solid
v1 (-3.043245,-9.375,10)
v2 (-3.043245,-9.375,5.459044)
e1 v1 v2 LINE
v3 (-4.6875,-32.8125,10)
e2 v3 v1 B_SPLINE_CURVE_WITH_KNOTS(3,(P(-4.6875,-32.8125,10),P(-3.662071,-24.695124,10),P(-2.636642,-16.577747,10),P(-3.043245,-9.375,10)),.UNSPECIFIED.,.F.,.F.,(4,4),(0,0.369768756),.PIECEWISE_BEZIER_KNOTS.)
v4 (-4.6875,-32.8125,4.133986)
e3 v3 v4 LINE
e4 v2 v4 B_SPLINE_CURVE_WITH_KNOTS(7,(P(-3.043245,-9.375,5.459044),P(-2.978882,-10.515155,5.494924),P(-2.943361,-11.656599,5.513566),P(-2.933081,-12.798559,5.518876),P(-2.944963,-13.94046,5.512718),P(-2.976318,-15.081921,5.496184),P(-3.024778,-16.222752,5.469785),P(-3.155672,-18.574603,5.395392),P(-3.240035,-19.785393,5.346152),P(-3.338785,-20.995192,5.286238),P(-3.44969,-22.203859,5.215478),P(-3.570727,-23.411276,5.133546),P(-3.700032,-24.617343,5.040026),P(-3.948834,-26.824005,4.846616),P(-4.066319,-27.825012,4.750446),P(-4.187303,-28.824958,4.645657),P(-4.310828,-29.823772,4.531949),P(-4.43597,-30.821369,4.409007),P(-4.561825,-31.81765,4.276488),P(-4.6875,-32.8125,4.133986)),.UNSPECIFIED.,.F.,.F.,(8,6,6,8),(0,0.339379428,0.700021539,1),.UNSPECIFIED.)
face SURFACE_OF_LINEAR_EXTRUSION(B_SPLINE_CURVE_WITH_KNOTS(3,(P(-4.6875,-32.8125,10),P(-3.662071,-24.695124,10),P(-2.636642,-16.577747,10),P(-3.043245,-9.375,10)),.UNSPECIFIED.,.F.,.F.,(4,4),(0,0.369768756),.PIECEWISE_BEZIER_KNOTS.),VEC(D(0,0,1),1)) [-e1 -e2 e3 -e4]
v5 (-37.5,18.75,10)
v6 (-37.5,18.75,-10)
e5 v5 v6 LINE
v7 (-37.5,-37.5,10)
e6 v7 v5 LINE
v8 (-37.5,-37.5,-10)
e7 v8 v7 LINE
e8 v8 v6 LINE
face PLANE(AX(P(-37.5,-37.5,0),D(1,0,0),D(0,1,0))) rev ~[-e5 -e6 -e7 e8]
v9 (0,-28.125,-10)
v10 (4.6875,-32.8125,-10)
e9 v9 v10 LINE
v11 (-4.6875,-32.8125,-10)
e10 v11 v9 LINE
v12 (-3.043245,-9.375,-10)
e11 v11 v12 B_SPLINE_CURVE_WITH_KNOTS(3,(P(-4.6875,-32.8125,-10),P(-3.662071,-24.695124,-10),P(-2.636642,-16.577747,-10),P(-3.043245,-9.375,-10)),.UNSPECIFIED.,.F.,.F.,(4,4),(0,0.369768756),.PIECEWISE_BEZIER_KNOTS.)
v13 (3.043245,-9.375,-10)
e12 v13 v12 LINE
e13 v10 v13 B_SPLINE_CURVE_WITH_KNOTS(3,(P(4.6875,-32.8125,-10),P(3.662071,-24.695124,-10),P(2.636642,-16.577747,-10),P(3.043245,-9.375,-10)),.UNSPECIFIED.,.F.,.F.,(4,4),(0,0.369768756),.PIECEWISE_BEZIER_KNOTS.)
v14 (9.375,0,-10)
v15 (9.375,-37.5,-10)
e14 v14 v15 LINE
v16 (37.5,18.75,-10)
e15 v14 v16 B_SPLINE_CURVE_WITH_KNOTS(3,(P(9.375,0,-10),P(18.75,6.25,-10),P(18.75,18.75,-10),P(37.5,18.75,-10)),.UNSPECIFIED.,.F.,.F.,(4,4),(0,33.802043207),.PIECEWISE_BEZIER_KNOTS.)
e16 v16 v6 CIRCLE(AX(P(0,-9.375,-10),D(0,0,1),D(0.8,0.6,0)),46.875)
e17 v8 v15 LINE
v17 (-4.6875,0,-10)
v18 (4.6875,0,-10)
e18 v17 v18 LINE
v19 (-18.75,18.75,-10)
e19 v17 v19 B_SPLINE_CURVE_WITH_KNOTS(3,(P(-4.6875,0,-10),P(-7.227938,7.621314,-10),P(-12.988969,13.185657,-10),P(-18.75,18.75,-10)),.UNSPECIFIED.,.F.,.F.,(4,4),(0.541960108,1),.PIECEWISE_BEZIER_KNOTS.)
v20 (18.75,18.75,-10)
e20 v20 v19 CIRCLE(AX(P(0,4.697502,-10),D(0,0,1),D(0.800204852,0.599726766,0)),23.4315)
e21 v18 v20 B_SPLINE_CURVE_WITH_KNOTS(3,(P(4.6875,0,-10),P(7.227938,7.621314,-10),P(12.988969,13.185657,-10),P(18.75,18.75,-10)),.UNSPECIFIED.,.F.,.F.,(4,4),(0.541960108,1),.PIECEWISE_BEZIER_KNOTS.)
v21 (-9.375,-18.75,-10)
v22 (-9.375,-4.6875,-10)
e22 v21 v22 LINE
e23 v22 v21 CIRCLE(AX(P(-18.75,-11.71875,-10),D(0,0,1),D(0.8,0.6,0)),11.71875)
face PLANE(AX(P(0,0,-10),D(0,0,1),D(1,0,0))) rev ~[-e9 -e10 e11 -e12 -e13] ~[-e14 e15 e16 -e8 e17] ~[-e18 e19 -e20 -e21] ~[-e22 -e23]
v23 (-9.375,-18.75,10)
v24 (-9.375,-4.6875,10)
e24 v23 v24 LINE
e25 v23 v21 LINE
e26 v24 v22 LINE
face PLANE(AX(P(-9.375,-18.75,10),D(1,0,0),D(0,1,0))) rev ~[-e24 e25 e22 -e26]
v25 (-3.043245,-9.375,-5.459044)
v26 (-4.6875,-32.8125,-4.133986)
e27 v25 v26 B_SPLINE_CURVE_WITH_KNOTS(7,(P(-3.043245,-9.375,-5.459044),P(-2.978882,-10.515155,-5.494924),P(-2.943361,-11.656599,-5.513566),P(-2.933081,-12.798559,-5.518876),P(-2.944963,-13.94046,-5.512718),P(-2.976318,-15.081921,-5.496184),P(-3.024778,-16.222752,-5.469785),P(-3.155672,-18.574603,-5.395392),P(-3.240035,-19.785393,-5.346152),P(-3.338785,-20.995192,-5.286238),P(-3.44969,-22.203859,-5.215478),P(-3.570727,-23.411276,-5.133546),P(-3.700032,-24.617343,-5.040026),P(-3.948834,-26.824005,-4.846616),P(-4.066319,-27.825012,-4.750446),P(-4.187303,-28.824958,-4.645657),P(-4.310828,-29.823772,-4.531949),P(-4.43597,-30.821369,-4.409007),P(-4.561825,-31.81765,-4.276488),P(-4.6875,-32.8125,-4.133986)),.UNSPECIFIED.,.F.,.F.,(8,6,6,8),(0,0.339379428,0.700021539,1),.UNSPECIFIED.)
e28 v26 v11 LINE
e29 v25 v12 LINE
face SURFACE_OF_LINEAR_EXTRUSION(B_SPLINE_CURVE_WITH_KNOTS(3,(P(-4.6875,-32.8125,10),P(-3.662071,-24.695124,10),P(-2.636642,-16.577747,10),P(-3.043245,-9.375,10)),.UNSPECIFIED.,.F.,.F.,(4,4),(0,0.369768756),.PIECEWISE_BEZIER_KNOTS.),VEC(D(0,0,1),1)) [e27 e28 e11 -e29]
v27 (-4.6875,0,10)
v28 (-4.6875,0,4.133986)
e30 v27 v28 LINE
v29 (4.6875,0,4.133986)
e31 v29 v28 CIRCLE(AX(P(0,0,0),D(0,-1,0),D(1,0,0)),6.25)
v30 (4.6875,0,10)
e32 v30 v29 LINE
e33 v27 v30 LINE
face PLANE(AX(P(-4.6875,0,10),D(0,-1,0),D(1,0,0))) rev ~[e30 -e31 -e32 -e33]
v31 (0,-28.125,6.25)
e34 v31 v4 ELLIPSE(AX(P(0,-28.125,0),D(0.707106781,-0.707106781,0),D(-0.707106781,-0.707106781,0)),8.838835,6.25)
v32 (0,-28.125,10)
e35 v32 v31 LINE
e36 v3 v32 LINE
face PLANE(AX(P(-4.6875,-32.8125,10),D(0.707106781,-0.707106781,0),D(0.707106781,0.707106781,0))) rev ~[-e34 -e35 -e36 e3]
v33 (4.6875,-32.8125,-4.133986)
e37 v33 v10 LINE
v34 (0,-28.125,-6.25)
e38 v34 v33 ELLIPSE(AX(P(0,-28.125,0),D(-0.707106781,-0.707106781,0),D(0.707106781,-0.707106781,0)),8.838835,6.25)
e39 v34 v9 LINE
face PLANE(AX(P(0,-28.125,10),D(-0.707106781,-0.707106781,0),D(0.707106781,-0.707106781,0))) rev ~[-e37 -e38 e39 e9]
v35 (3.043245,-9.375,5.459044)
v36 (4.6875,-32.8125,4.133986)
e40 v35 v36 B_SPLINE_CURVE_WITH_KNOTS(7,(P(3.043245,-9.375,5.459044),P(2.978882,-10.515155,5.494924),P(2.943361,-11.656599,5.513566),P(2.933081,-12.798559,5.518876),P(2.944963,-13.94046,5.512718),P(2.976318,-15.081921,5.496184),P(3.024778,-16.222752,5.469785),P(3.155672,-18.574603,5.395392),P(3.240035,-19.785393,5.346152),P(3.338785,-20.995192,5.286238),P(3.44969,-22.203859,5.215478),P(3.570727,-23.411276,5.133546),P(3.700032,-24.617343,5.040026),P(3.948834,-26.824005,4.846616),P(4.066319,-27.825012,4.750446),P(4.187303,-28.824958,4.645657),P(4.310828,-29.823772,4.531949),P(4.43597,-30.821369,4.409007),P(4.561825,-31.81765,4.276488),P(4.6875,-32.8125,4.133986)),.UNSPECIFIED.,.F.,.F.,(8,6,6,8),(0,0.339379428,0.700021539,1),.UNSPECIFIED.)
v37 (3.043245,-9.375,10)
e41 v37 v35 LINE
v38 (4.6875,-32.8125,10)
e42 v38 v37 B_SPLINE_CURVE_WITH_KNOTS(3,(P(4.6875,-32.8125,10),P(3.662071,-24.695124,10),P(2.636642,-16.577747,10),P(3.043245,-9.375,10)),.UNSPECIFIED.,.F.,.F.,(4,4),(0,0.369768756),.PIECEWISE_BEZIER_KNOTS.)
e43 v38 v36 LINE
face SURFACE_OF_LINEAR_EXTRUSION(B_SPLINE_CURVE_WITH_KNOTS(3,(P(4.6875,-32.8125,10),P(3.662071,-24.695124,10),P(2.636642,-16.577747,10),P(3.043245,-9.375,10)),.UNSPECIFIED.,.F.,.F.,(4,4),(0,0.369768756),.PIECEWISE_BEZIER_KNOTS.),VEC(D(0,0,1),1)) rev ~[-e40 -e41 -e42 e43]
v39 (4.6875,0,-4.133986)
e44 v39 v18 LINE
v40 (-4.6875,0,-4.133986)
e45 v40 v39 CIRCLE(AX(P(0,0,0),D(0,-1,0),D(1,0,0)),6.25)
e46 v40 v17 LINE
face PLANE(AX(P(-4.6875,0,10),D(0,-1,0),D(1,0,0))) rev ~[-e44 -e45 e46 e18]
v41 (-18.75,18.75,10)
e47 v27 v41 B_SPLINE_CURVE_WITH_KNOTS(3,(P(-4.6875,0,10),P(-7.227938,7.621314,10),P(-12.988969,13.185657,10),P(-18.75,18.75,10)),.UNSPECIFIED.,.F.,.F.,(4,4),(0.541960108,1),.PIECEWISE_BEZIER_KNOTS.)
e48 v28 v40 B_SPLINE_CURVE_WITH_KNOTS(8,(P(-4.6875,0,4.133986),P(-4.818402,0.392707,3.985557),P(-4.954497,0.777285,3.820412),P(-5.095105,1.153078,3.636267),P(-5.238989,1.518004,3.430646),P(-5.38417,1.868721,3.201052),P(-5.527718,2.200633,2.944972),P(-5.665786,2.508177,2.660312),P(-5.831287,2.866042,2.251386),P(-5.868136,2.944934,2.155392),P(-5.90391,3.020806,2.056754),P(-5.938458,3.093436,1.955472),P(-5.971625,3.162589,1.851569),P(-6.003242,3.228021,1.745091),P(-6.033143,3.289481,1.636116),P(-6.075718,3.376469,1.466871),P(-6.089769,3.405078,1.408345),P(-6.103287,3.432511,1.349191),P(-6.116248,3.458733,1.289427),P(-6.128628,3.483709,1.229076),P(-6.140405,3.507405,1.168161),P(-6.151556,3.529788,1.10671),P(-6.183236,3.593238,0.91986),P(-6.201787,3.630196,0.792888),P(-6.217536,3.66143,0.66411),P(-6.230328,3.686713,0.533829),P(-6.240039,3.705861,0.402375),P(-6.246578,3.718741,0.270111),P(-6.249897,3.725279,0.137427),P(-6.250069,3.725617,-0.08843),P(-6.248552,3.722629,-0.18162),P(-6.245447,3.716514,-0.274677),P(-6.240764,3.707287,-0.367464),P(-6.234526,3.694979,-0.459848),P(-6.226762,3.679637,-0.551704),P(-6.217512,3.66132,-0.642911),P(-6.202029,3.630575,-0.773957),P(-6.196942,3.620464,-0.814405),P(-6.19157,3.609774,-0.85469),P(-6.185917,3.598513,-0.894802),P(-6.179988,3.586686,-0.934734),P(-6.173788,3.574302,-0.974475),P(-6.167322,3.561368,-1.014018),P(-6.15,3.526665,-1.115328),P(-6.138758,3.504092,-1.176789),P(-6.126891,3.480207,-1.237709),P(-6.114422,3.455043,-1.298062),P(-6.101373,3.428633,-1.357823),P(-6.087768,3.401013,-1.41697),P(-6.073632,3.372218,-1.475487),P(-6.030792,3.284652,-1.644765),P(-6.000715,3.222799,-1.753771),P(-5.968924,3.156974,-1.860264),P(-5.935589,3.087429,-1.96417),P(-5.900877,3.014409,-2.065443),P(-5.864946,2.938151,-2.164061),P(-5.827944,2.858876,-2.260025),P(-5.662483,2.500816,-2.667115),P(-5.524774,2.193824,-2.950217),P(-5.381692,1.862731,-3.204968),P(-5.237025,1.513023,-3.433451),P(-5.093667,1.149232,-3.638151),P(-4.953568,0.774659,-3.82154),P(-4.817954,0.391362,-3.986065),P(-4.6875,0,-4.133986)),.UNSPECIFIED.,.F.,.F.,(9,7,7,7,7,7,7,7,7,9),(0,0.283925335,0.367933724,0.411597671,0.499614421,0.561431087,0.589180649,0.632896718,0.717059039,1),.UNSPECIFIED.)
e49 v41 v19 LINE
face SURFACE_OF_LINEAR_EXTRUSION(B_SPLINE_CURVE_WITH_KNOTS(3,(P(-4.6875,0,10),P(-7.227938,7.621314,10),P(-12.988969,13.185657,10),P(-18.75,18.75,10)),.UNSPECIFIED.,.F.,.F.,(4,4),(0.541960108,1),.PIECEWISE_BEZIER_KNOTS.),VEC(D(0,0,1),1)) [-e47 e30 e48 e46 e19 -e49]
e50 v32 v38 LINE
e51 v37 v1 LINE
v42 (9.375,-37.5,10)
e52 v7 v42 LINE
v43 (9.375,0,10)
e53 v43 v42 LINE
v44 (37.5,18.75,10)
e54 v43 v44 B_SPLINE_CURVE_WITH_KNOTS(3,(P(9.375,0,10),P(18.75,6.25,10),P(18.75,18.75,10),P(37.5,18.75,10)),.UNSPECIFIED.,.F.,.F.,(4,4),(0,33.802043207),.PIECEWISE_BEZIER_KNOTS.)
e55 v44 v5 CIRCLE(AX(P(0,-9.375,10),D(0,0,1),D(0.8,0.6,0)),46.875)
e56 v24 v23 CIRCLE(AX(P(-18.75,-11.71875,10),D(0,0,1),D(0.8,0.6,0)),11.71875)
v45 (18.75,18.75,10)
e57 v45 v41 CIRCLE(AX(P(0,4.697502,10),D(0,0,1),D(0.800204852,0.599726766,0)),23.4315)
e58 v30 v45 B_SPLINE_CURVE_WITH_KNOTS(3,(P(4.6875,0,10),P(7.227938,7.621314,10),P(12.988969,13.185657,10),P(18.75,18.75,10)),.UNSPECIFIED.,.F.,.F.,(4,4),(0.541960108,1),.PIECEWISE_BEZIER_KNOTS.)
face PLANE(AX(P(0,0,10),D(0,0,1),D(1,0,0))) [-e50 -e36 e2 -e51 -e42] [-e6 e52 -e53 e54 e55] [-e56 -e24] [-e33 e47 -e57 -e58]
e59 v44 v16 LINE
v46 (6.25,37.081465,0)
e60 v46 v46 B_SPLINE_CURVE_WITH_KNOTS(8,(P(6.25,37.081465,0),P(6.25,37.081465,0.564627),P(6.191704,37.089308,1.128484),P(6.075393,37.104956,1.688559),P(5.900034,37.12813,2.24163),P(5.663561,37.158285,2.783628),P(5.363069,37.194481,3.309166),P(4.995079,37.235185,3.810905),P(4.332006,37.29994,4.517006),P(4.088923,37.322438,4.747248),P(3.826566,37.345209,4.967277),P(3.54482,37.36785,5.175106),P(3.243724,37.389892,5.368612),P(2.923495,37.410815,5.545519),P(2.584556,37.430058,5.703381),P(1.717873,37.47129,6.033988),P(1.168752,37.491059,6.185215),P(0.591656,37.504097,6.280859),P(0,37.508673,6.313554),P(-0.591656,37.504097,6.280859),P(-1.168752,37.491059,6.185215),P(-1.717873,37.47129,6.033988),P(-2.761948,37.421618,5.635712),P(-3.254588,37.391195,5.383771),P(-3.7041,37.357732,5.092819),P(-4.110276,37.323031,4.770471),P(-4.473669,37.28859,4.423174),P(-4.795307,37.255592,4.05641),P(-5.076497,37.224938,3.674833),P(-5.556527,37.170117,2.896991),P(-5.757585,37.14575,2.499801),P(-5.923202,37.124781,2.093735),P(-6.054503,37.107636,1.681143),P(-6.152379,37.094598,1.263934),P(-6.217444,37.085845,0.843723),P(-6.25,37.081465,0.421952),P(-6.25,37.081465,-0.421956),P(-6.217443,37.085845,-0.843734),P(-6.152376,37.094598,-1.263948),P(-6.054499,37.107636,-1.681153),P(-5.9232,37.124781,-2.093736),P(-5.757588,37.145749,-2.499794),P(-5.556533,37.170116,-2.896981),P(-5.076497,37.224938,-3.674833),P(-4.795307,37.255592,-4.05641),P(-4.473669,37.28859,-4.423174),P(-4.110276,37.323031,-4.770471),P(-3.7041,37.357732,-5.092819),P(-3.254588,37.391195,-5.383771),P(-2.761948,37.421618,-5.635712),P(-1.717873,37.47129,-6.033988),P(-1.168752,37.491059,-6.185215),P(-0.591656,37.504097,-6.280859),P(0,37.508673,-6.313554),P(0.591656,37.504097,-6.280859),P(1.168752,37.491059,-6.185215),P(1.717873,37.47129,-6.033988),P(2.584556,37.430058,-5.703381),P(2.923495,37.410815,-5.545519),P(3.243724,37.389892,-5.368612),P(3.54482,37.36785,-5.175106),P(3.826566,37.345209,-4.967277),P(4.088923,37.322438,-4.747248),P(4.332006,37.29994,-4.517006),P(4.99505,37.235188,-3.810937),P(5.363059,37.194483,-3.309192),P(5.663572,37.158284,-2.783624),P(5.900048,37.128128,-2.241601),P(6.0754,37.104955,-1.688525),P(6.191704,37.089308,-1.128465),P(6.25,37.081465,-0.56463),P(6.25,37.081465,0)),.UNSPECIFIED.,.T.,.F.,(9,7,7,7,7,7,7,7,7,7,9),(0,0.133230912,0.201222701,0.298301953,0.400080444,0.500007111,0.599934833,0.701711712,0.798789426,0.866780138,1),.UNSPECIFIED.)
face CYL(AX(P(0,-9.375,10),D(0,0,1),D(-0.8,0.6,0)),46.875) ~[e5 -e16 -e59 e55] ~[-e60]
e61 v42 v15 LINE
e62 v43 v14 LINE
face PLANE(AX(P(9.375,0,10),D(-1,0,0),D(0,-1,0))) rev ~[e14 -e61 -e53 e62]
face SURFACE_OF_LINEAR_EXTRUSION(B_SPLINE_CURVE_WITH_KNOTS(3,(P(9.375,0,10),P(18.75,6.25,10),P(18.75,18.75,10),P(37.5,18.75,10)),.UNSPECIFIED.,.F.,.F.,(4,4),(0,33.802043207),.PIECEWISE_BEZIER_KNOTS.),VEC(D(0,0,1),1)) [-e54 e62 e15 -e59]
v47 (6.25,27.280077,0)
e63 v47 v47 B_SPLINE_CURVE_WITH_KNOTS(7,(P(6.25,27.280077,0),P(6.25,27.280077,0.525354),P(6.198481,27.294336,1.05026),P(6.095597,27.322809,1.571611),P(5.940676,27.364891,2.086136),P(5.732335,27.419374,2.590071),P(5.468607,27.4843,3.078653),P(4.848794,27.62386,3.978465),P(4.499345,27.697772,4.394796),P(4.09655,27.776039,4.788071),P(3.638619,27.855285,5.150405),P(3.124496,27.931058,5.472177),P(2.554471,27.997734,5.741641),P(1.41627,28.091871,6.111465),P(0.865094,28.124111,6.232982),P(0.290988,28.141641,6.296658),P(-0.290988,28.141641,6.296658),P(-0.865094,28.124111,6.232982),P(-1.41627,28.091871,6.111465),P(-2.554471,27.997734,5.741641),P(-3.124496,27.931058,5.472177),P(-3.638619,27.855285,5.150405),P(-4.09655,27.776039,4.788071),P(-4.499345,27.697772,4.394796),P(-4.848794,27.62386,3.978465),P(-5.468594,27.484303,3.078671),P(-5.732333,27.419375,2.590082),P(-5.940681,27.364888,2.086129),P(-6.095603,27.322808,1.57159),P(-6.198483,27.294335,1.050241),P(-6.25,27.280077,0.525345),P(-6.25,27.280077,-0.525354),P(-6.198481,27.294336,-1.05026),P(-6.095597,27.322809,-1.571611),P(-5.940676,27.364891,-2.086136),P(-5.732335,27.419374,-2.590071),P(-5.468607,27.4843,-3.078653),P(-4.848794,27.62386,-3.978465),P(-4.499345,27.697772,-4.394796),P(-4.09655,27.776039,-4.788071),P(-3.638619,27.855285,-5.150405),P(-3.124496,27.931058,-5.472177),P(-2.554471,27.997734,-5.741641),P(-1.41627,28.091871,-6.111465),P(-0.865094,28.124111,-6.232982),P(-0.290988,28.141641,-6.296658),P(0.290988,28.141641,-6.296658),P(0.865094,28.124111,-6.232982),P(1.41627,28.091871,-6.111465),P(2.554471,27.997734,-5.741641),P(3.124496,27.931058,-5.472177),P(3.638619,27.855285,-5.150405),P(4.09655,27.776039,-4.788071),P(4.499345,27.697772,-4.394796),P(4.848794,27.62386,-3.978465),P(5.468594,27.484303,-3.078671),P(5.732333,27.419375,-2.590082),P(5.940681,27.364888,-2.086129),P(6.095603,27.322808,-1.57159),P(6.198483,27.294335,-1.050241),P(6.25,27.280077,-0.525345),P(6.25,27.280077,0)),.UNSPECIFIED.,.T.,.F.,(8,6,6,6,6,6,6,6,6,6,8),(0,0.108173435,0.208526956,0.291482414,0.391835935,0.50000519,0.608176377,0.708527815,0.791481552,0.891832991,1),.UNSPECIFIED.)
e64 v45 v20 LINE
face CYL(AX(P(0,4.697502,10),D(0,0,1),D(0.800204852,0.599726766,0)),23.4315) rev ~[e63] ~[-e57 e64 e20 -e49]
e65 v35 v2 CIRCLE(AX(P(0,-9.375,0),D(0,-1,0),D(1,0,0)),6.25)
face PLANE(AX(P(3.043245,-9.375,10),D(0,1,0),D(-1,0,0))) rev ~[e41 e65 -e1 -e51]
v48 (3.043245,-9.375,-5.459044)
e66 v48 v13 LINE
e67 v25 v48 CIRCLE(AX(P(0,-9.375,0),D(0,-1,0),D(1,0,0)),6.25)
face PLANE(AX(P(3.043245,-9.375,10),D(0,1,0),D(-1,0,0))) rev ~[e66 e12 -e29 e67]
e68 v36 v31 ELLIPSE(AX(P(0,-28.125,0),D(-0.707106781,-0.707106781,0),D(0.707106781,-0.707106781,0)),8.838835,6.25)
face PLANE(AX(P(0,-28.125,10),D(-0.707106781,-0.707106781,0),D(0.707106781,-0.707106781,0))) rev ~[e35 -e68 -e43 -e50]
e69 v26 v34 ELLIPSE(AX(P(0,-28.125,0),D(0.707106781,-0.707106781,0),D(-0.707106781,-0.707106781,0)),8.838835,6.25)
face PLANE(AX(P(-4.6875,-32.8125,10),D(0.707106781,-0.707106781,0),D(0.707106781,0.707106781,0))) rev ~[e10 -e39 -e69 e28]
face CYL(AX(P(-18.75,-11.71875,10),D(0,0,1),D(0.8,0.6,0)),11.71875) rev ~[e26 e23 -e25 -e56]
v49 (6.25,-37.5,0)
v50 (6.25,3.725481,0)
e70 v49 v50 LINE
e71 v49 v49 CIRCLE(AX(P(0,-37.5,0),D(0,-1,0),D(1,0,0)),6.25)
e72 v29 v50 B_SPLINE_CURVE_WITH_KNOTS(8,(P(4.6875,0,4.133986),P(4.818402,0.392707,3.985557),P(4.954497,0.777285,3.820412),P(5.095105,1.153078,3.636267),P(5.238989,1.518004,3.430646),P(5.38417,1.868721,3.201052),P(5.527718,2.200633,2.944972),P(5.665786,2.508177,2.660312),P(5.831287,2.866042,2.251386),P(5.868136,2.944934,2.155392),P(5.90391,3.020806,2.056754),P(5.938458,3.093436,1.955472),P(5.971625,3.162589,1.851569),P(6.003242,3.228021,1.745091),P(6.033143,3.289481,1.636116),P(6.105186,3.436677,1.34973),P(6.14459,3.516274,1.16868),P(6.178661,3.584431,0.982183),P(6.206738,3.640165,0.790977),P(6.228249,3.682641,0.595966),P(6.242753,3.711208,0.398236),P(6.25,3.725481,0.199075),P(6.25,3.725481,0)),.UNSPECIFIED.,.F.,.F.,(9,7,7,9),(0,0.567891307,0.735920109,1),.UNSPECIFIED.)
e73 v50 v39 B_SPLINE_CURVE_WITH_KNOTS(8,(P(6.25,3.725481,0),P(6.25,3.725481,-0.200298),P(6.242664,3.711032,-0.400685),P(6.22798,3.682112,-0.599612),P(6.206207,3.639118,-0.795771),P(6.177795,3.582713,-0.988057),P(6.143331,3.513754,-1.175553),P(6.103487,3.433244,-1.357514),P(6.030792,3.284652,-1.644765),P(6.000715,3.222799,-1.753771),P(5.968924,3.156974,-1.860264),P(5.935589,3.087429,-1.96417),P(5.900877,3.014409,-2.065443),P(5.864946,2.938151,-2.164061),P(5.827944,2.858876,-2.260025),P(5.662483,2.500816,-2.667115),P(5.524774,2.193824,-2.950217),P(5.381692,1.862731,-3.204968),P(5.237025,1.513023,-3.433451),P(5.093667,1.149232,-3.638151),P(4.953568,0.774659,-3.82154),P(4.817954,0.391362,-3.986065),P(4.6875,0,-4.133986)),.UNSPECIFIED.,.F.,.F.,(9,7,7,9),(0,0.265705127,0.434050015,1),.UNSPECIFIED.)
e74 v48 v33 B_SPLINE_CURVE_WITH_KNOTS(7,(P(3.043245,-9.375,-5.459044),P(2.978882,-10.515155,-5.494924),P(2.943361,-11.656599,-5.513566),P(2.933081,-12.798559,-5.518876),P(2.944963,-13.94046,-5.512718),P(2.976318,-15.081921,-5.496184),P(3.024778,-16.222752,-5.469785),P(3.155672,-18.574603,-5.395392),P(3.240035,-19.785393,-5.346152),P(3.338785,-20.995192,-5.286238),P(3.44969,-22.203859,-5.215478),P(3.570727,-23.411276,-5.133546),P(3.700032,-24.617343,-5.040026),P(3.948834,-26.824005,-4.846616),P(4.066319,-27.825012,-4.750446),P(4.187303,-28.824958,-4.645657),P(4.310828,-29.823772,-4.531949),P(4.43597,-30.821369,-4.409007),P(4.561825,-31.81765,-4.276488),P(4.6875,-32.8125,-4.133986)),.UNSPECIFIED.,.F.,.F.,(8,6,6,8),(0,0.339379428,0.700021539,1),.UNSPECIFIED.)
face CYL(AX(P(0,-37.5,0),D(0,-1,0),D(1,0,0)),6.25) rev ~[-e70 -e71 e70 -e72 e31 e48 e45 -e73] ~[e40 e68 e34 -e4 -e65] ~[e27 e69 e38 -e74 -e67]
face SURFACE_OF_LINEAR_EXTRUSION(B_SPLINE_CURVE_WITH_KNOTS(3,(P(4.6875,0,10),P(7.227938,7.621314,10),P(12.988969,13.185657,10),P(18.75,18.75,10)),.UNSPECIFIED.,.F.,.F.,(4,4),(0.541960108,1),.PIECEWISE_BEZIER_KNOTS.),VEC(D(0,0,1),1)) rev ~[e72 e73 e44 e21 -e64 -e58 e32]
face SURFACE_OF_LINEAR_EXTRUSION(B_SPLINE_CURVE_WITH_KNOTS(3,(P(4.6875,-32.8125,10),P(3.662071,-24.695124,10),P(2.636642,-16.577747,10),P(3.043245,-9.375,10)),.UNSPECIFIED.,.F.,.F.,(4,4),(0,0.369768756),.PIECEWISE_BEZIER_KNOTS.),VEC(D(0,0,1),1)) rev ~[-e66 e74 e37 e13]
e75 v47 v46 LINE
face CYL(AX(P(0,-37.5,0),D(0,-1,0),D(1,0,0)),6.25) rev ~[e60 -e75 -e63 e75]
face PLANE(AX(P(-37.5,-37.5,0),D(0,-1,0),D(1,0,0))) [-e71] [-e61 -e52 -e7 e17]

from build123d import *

# Parameters (mm, degrees)
F0_W          = 75
F0_H          = 75
F1_DEPTH      = 10
F1_DEPTH_BACK = 10
F3_DEPTH      = 20
F4_R          = 6.25
F5_DEPTH      = 75


# Not quite as in the source:
# - a feature names something its author has since deleted; it is built from what else it names


with BuildPart() as f1:
    # F0 (on Top) → F1 (new body, two sides)
    with BuildSketch(Plane.XY) as f1_sk:
        Rectangle(F0_W, F0_H)
    extrude(amount=F1_DEPTH)
    extrude(f1_sk.sketch, amount=-F1_DEPTH_BACK)

    # F2 (on face) → F3 (cut)
    with BuildSketch(Plane.XY.offset(10)):
        with BuildLine():
            Line((37.5, -37.5), (37.5, 18.75))
            add(Edge.make_bspline(
                [(9.375, 0), (18.75, 6.25), (18.75, 18.75), (37.5, 18.75)],
                knots=[0, 0, 0, 0, 33.8020432075, 33.8020432075, 33.8020432075, 33.8020432075], degree=3))
            Line((9.375, 0), (9.375, -37.5))
            Line((9.375, -37.5), (18.75, -37.5))
            Line((18.75, -37.5), (37.5, -37.5))
        make_face()
        with BuildLine():
            ThreePointArc((0, 37.5), (20.9631372891, 32.5512745781), (37.5, 18.75))
            Line((37.5, 18.75), (37.5, 37.5))
            Line((37.5, 37.5), (0, 37.5))
        make_face()
        with BuildLine():
            ThreePointArc((-37.5, 18.75), (-20.9631372891, 32.5512745781), (0, 37.5))
            Line((0, 37.5), (-37.5, 37.5))
            Line((-37.5, 37.5), (-37.5, 18.75))
        make_face()
        with BuildLine():
            Line((0, -28.125), (4.6875, -32.8125))
            add(Edge.make_bspline(
                [(4.6875, -32.8125), (3.6620711894, -24.6951237234), (2.6366423788, -16.5777474468), (3.0432450075, -9.375)],
                knots=[0, 0, 0, 0, 0.3697687561, 0.3697687561, 0.3697687561, 0.3697687561], degree=3))
            Line((3.0432450075, -9.375), (-3.0432450075, -9.375))
            add(Edge.make_bspline(
                [(-4.6875, -32.8125), (-3.6620711894, -24.6951237234), (-2.6366423788, -16.5777474468), (-3.0432450075, -9.375)],
                knots=[0, 0, 0, 0, 0.3697687561, 0.3697687561, 0.3697687561, 0.3697687561], degree=3))
            Line((-4.6875, -32.8125), (0, -28.125))
        make_face()
        with BuildLine():
            Line((-9.375, -18.75), (-9.375, -4.6875))
            ThreePointArc((-9.375, -4.6875), (-25.78125, -2.34375), (-28.125, -18.75))
            ThreePointArc((-28.125, -18.75), (-18.75, -23.4375), (-9.375, -18.75))
        make_face()
        with BuildLine():
            Line((-4.6875, 0), (4.6875, 0))
            add(Edge.make_bspline(
                [(4.6875, 0), (7.2279380084, 7.6213140251), (12.9889690042, 13.1856570125), (18.75, 18.75)],
                knots=[0.5419601085, 0.5419601085, 0.5419601085, 0.5419601085, 1, 1, 1, 1], degree=3))
            ThreePointArc((18.75, 18.75), (0, 28.1290022772), (-18.75, 18.75))
            add(Edge.make_bspline(
                [(-4.6875, 0), (-7.2279380084, 7.6213140251), (-12.9889690042, 13.1856570125), (-18.75, 18.75)],
                knots=[0.5419601085, 0.5419601085, 0.5419601085, 0.5419601085, 1, 1, 1, 1], degree=3))
        make_face()
    extrude(amount=-F3_DEPTH, mode=Mode.SUBTRACT)

    # F4 (on face) → F5 (cut)
    with BuildSketch(Plane.XZ.offset(37.5)):
        Circle(F4_R)
    extrude(amount=-F5_DEPTH, mode=Mode.SUBTRACT)


solid = f1.part
